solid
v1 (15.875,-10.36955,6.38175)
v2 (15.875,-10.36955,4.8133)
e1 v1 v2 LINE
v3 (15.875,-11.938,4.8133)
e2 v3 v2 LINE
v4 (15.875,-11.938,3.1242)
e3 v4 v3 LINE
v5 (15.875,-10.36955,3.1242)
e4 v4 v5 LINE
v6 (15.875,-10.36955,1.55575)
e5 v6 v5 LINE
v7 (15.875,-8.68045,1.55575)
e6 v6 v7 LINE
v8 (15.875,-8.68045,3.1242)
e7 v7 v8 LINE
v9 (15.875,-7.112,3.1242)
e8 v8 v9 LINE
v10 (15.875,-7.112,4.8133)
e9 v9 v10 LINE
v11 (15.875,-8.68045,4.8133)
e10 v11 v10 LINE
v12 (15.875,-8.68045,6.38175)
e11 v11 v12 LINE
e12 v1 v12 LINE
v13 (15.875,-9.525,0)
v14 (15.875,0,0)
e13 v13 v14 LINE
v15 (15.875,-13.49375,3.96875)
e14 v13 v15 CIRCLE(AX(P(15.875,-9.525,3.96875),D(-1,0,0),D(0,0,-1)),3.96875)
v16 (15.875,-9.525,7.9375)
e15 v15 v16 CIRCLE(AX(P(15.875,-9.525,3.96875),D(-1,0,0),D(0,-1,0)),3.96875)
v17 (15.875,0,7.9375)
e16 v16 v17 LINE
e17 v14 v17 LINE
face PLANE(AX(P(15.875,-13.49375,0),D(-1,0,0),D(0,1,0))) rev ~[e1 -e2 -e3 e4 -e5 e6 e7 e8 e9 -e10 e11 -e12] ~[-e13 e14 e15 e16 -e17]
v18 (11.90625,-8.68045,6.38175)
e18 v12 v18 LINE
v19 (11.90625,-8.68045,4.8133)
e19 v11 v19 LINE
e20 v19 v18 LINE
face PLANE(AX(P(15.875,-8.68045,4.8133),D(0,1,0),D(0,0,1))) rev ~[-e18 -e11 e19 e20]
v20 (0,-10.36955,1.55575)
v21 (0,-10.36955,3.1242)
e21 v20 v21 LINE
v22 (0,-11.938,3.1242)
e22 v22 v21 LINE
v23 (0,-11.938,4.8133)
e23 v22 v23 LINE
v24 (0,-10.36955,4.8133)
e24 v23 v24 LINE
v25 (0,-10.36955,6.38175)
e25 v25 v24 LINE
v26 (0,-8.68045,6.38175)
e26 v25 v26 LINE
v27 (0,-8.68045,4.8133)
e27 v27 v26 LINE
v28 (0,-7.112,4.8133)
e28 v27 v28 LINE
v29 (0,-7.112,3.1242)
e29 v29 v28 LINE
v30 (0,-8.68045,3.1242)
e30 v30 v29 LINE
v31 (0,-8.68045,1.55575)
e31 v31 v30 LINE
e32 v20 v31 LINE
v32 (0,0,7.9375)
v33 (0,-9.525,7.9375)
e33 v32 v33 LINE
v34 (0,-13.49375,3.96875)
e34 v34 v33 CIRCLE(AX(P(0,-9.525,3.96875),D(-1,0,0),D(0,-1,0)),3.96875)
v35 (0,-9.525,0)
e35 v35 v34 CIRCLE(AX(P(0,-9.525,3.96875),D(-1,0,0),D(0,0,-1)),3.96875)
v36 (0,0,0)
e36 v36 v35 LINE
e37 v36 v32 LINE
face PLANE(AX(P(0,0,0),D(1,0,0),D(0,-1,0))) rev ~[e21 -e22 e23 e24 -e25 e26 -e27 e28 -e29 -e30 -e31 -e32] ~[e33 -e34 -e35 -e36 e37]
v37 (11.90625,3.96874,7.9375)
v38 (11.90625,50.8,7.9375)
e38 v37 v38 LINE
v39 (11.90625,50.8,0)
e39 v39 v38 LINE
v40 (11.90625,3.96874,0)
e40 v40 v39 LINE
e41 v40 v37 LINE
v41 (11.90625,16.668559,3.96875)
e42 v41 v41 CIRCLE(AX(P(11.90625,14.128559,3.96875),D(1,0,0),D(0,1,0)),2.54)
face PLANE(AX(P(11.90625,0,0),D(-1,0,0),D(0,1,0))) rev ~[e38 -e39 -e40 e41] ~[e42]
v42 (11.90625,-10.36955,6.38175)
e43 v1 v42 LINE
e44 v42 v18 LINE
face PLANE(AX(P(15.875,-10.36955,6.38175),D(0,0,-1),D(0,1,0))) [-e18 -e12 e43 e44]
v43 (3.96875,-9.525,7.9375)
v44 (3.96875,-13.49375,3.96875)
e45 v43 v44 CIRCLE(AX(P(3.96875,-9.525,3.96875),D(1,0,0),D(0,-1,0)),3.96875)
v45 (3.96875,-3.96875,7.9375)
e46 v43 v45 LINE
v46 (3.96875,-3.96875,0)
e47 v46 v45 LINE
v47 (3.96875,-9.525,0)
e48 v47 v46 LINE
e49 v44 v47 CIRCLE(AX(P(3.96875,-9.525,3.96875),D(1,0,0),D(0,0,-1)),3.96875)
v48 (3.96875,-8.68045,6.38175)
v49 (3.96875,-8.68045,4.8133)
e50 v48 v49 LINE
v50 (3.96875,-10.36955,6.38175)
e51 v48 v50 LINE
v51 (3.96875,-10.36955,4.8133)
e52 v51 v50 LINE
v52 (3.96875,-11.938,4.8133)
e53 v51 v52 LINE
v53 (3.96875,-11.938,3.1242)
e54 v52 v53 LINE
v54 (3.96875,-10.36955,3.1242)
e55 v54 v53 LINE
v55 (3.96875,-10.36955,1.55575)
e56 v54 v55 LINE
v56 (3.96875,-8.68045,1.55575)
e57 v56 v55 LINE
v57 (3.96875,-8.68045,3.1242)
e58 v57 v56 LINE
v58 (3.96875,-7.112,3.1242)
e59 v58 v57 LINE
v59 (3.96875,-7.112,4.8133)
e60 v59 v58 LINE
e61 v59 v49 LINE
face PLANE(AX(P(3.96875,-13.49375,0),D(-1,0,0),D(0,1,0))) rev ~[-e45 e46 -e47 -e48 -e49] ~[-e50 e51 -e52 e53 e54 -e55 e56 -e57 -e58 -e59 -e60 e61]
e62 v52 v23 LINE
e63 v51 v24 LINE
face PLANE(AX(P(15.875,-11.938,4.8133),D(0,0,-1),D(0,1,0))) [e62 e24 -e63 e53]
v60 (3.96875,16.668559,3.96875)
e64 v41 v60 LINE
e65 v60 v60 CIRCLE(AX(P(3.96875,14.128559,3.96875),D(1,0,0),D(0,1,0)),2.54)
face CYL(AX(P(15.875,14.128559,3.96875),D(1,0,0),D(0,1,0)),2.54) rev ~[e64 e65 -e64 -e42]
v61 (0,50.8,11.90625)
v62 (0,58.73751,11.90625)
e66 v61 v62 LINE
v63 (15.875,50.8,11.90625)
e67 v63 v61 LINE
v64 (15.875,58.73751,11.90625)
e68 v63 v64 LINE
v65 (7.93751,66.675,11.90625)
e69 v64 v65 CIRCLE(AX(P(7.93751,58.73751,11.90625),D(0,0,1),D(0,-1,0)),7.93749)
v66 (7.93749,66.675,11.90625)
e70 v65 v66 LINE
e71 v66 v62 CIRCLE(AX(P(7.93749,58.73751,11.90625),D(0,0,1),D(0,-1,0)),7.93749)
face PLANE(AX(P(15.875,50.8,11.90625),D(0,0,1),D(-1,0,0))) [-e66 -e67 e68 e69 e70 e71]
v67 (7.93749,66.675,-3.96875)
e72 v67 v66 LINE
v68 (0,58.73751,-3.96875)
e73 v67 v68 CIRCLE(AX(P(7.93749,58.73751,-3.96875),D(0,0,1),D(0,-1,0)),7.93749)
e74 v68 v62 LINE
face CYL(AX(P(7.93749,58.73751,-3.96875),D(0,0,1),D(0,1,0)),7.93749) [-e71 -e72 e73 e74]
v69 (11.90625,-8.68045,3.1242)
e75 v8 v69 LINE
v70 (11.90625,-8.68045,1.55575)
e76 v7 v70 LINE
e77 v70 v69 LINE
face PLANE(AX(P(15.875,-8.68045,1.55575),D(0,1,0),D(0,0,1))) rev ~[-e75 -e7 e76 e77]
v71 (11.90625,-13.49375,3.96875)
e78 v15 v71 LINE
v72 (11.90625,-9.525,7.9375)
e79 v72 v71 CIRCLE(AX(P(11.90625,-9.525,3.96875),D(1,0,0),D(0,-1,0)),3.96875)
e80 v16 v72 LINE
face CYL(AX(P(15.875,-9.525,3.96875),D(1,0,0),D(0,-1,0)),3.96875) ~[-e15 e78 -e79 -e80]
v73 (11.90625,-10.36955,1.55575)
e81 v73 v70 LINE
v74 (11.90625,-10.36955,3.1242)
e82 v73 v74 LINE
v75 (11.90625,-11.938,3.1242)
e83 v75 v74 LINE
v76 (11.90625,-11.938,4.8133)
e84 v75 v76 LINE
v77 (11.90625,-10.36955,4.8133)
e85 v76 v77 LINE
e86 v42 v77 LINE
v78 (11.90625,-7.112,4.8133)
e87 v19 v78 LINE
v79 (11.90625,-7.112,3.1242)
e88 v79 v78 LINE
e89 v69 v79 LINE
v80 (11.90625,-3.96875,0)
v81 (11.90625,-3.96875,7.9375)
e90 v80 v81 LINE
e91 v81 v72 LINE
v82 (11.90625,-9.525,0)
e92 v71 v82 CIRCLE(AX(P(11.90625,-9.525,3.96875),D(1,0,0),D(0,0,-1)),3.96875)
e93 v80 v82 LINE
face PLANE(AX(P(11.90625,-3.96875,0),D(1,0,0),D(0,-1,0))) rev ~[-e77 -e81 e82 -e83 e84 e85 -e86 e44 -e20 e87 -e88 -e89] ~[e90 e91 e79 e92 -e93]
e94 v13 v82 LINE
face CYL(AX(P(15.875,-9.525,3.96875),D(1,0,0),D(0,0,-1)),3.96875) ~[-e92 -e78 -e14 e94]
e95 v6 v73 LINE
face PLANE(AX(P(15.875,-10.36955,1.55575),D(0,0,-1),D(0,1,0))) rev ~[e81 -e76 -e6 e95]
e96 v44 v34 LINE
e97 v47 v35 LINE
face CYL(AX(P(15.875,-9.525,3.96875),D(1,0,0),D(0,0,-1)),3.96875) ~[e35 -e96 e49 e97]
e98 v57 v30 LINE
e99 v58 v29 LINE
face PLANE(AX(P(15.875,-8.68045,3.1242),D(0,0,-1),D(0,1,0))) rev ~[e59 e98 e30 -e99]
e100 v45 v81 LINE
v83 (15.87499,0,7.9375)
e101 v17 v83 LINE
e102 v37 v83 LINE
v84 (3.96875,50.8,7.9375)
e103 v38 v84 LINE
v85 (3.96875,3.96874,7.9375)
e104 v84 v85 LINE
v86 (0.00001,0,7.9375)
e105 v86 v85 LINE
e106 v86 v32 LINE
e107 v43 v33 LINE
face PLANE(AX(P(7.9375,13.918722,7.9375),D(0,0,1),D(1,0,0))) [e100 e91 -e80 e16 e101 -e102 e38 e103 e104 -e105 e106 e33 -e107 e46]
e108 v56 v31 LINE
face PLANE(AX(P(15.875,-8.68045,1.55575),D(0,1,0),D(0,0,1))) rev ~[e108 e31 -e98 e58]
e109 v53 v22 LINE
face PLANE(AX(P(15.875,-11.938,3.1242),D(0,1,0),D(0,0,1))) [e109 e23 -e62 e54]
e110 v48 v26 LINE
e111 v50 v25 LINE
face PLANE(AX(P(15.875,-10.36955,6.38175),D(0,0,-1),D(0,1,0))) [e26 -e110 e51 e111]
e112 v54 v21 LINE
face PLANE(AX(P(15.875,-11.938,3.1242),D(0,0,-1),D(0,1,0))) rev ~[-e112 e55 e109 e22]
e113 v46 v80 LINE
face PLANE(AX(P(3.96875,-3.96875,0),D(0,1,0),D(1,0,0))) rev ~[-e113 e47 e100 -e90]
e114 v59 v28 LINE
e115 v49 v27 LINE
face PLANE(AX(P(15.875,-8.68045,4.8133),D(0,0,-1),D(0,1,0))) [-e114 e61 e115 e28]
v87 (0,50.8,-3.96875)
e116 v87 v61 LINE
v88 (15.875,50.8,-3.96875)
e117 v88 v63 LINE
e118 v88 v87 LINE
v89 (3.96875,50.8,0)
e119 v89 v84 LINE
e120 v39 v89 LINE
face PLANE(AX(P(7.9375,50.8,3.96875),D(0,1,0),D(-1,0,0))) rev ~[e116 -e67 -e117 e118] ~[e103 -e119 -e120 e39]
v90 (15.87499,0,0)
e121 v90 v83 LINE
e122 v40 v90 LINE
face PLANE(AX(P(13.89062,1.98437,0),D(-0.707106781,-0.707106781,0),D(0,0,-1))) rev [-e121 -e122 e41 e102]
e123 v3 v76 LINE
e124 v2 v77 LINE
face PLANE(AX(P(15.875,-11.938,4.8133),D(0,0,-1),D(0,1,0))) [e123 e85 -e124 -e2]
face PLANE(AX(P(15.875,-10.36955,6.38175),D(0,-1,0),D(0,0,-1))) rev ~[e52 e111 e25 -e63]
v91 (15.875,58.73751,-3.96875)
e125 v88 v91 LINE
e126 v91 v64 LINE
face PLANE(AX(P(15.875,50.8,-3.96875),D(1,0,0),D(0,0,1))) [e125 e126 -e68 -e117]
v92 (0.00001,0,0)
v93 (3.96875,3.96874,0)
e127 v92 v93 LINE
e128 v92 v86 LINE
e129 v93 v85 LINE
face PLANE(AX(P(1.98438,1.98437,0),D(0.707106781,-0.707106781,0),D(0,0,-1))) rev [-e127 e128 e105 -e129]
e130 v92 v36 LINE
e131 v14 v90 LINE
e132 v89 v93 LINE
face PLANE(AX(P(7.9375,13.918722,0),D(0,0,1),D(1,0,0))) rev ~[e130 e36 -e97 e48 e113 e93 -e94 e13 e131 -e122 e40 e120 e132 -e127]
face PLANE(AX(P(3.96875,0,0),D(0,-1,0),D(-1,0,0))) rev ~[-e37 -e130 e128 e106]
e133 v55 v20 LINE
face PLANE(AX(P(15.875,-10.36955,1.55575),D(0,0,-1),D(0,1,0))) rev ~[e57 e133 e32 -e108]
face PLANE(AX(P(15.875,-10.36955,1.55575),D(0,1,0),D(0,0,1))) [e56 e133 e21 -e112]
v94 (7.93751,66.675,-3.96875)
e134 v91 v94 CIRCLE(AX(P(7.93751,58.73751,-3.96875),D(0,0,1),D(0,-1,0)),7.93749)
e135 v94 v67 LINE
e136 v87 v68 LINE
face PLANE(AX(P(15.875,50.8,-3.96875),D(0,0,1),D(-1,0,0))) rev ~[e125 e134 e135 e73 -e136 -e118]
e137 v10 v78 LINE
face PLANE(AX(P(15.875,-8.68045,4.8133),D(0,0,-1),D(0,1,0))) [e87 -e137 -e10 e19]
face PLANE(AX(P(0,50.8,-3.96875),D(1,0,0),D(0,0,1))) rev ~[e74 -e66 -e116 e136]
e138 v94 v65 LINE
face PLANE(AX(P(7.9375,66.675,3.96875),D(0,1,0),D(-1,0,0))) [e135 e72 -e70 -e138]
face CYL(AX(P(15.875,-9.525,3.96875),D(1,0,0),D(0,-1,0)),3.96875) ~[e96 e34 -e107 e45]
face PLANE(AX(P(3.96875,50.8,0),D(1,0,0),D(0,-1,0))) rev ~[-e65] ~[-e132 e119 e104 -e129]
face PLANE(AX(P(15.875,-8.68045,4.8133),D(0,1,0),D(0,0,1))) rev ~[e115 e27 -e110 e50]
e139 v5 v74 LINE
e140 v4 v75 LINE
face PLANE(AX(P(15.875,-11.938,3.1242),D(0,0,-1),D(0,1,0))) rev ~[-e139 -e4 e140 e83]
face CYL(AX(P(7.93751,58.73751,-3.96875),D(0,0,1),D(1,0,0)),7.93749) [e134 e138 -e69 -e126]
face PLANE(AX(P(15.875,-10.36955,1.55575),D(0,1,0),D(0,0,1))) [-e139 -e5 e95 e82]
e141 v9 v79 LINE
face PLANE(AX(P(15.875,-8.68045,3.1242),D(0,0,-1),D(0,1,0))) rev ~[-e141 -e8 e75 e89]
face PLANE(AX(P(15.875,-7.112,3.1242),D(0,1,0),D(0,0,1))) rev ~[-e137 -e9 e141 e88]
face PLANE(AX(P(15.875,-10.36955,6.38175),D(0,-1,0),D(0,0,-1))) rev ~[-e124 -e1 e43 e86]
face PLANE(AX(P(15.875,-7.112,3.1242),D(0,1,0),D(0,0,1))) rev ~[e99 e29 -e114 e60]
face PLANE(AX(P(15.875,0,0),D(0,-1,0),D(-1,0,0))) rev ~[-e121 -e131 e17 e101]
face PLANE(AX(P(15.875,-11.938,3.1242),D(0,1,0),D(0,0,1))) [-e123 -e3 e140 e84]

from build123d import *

# Parameters (mm, degrees)
F1_DEPTH = 7.9375
F2_R     = 2.54
F2_W     = 1.6891
F2_H     = 1.56845
F2_H_2   = 1.6891
F2_W_2   = 1.56845
F3_DEPTH = 15.875
F4_SIZE  = 3.96874
F5_W     = 15.875
F5_H     = 15.875
F6_DEPTH = 15.875
F7_R     = 7.93749


# Not quite as in the source:
# - a fillet or chamfer is up to 0.001 mm smaller than in the source, because OpenCascade refuses the exact size


with BuildPart() as f1:
    # F0 (on Top) → F1 (new body)
    with BuildSketch(Plane.XY):
        Polygon((3.96875, 0), (0, 0), (0, -13.49375), (3.96875, -13.49375), (3.96875, -3.96875), (11.90625, -3.96875), (11.90625, -13.49375), (15.875, -13.49375), (15.875, 0), (11.90625, 0), (11.90625, 50.8), (3.96875, 50.8), align=None)
    extrude(amount=F1_DEPTH)

    # F2 (on face) → F3 (cut, through all)
    with BuildSketch(Plane.YZ.offset(15.875)):
        with BuildLine():
            ThreePointArc((-9.525, 0), (-12.3313300378, 1.1624199622), (-13.49375, 3.96875))
            Line((-13.49375, 3.96875), (-13.49375, 0))
            Line((-13.49375, 0), (-9.525, 0))
        make_face()
        with BuildLine():
            ThreePointArc((-13.49375, 3.96875), (-12.3313300378, 6.7750800378), (-9.525, 7.9375))
            Line((-9.525, 7.9375), (-13.49375, 7.9375))
            Line((-13.49375, 7.9375), (-13.49375, 3.96875))
        make_face()
        with Locations((14.128559196, 3.96875)):
            Circle(F2_R)
        with Locations((-9.525, 5.597525)):
            Rectangle(F2_W, F2_H)
        with Locations((-9.525, 3.96875)):
            Rectangle(F2_W, F2_H_2)
        with Locations((-11.153775, 3.96875)):
            Rectangle(F2_W_2, F2_H_2)
        with Locations((-7.896225, 3.96875)):
            Rectangle(F2_W_2, F2_H_2)
        with Locations((-9.525, 2.339975)):
            Rectangle(F2_W, F2_H)
    extrude(amount=-F3_DEPTH, mode=Mode.SUBTRACT)

    # F4 (size 3.96875 in the source; OpenCascade refuses exactly that, so slightly less here)
    f4_edges = [f1.edges().sort_by_distance(p)[0] for p in [
        (11.90625, 0, 3.96875),
        (3.96875, 0, 3.96875),
    ]]
    chamfer(f4_edges, length=F4_SIZE)

    # F5 (on face) → F6 (join)
    with BuildSketch(Plane(origin=(0, 50.8, 0), x_dir=(-1, 0, 0), z_dir=(0, 1, 0))):
        with Locations((-7.9375, 3.96875)):
            Rectangle(F5_W, F5_H)
    extrude(amount=F6_DEPTH)

    # F7 (radius 7.9375 in the source; OpenCascade refuses exactly that, so slightly less here)
    f7_edges = [f1.edges().sort_by_distance(p)[0] for p in [
        (15.875, 66.675, 3.96875),
        (0, 66.675, 3.96875),
    ]]
    fillet(f7_edges, radius=F7_R)


solid = f1.part
